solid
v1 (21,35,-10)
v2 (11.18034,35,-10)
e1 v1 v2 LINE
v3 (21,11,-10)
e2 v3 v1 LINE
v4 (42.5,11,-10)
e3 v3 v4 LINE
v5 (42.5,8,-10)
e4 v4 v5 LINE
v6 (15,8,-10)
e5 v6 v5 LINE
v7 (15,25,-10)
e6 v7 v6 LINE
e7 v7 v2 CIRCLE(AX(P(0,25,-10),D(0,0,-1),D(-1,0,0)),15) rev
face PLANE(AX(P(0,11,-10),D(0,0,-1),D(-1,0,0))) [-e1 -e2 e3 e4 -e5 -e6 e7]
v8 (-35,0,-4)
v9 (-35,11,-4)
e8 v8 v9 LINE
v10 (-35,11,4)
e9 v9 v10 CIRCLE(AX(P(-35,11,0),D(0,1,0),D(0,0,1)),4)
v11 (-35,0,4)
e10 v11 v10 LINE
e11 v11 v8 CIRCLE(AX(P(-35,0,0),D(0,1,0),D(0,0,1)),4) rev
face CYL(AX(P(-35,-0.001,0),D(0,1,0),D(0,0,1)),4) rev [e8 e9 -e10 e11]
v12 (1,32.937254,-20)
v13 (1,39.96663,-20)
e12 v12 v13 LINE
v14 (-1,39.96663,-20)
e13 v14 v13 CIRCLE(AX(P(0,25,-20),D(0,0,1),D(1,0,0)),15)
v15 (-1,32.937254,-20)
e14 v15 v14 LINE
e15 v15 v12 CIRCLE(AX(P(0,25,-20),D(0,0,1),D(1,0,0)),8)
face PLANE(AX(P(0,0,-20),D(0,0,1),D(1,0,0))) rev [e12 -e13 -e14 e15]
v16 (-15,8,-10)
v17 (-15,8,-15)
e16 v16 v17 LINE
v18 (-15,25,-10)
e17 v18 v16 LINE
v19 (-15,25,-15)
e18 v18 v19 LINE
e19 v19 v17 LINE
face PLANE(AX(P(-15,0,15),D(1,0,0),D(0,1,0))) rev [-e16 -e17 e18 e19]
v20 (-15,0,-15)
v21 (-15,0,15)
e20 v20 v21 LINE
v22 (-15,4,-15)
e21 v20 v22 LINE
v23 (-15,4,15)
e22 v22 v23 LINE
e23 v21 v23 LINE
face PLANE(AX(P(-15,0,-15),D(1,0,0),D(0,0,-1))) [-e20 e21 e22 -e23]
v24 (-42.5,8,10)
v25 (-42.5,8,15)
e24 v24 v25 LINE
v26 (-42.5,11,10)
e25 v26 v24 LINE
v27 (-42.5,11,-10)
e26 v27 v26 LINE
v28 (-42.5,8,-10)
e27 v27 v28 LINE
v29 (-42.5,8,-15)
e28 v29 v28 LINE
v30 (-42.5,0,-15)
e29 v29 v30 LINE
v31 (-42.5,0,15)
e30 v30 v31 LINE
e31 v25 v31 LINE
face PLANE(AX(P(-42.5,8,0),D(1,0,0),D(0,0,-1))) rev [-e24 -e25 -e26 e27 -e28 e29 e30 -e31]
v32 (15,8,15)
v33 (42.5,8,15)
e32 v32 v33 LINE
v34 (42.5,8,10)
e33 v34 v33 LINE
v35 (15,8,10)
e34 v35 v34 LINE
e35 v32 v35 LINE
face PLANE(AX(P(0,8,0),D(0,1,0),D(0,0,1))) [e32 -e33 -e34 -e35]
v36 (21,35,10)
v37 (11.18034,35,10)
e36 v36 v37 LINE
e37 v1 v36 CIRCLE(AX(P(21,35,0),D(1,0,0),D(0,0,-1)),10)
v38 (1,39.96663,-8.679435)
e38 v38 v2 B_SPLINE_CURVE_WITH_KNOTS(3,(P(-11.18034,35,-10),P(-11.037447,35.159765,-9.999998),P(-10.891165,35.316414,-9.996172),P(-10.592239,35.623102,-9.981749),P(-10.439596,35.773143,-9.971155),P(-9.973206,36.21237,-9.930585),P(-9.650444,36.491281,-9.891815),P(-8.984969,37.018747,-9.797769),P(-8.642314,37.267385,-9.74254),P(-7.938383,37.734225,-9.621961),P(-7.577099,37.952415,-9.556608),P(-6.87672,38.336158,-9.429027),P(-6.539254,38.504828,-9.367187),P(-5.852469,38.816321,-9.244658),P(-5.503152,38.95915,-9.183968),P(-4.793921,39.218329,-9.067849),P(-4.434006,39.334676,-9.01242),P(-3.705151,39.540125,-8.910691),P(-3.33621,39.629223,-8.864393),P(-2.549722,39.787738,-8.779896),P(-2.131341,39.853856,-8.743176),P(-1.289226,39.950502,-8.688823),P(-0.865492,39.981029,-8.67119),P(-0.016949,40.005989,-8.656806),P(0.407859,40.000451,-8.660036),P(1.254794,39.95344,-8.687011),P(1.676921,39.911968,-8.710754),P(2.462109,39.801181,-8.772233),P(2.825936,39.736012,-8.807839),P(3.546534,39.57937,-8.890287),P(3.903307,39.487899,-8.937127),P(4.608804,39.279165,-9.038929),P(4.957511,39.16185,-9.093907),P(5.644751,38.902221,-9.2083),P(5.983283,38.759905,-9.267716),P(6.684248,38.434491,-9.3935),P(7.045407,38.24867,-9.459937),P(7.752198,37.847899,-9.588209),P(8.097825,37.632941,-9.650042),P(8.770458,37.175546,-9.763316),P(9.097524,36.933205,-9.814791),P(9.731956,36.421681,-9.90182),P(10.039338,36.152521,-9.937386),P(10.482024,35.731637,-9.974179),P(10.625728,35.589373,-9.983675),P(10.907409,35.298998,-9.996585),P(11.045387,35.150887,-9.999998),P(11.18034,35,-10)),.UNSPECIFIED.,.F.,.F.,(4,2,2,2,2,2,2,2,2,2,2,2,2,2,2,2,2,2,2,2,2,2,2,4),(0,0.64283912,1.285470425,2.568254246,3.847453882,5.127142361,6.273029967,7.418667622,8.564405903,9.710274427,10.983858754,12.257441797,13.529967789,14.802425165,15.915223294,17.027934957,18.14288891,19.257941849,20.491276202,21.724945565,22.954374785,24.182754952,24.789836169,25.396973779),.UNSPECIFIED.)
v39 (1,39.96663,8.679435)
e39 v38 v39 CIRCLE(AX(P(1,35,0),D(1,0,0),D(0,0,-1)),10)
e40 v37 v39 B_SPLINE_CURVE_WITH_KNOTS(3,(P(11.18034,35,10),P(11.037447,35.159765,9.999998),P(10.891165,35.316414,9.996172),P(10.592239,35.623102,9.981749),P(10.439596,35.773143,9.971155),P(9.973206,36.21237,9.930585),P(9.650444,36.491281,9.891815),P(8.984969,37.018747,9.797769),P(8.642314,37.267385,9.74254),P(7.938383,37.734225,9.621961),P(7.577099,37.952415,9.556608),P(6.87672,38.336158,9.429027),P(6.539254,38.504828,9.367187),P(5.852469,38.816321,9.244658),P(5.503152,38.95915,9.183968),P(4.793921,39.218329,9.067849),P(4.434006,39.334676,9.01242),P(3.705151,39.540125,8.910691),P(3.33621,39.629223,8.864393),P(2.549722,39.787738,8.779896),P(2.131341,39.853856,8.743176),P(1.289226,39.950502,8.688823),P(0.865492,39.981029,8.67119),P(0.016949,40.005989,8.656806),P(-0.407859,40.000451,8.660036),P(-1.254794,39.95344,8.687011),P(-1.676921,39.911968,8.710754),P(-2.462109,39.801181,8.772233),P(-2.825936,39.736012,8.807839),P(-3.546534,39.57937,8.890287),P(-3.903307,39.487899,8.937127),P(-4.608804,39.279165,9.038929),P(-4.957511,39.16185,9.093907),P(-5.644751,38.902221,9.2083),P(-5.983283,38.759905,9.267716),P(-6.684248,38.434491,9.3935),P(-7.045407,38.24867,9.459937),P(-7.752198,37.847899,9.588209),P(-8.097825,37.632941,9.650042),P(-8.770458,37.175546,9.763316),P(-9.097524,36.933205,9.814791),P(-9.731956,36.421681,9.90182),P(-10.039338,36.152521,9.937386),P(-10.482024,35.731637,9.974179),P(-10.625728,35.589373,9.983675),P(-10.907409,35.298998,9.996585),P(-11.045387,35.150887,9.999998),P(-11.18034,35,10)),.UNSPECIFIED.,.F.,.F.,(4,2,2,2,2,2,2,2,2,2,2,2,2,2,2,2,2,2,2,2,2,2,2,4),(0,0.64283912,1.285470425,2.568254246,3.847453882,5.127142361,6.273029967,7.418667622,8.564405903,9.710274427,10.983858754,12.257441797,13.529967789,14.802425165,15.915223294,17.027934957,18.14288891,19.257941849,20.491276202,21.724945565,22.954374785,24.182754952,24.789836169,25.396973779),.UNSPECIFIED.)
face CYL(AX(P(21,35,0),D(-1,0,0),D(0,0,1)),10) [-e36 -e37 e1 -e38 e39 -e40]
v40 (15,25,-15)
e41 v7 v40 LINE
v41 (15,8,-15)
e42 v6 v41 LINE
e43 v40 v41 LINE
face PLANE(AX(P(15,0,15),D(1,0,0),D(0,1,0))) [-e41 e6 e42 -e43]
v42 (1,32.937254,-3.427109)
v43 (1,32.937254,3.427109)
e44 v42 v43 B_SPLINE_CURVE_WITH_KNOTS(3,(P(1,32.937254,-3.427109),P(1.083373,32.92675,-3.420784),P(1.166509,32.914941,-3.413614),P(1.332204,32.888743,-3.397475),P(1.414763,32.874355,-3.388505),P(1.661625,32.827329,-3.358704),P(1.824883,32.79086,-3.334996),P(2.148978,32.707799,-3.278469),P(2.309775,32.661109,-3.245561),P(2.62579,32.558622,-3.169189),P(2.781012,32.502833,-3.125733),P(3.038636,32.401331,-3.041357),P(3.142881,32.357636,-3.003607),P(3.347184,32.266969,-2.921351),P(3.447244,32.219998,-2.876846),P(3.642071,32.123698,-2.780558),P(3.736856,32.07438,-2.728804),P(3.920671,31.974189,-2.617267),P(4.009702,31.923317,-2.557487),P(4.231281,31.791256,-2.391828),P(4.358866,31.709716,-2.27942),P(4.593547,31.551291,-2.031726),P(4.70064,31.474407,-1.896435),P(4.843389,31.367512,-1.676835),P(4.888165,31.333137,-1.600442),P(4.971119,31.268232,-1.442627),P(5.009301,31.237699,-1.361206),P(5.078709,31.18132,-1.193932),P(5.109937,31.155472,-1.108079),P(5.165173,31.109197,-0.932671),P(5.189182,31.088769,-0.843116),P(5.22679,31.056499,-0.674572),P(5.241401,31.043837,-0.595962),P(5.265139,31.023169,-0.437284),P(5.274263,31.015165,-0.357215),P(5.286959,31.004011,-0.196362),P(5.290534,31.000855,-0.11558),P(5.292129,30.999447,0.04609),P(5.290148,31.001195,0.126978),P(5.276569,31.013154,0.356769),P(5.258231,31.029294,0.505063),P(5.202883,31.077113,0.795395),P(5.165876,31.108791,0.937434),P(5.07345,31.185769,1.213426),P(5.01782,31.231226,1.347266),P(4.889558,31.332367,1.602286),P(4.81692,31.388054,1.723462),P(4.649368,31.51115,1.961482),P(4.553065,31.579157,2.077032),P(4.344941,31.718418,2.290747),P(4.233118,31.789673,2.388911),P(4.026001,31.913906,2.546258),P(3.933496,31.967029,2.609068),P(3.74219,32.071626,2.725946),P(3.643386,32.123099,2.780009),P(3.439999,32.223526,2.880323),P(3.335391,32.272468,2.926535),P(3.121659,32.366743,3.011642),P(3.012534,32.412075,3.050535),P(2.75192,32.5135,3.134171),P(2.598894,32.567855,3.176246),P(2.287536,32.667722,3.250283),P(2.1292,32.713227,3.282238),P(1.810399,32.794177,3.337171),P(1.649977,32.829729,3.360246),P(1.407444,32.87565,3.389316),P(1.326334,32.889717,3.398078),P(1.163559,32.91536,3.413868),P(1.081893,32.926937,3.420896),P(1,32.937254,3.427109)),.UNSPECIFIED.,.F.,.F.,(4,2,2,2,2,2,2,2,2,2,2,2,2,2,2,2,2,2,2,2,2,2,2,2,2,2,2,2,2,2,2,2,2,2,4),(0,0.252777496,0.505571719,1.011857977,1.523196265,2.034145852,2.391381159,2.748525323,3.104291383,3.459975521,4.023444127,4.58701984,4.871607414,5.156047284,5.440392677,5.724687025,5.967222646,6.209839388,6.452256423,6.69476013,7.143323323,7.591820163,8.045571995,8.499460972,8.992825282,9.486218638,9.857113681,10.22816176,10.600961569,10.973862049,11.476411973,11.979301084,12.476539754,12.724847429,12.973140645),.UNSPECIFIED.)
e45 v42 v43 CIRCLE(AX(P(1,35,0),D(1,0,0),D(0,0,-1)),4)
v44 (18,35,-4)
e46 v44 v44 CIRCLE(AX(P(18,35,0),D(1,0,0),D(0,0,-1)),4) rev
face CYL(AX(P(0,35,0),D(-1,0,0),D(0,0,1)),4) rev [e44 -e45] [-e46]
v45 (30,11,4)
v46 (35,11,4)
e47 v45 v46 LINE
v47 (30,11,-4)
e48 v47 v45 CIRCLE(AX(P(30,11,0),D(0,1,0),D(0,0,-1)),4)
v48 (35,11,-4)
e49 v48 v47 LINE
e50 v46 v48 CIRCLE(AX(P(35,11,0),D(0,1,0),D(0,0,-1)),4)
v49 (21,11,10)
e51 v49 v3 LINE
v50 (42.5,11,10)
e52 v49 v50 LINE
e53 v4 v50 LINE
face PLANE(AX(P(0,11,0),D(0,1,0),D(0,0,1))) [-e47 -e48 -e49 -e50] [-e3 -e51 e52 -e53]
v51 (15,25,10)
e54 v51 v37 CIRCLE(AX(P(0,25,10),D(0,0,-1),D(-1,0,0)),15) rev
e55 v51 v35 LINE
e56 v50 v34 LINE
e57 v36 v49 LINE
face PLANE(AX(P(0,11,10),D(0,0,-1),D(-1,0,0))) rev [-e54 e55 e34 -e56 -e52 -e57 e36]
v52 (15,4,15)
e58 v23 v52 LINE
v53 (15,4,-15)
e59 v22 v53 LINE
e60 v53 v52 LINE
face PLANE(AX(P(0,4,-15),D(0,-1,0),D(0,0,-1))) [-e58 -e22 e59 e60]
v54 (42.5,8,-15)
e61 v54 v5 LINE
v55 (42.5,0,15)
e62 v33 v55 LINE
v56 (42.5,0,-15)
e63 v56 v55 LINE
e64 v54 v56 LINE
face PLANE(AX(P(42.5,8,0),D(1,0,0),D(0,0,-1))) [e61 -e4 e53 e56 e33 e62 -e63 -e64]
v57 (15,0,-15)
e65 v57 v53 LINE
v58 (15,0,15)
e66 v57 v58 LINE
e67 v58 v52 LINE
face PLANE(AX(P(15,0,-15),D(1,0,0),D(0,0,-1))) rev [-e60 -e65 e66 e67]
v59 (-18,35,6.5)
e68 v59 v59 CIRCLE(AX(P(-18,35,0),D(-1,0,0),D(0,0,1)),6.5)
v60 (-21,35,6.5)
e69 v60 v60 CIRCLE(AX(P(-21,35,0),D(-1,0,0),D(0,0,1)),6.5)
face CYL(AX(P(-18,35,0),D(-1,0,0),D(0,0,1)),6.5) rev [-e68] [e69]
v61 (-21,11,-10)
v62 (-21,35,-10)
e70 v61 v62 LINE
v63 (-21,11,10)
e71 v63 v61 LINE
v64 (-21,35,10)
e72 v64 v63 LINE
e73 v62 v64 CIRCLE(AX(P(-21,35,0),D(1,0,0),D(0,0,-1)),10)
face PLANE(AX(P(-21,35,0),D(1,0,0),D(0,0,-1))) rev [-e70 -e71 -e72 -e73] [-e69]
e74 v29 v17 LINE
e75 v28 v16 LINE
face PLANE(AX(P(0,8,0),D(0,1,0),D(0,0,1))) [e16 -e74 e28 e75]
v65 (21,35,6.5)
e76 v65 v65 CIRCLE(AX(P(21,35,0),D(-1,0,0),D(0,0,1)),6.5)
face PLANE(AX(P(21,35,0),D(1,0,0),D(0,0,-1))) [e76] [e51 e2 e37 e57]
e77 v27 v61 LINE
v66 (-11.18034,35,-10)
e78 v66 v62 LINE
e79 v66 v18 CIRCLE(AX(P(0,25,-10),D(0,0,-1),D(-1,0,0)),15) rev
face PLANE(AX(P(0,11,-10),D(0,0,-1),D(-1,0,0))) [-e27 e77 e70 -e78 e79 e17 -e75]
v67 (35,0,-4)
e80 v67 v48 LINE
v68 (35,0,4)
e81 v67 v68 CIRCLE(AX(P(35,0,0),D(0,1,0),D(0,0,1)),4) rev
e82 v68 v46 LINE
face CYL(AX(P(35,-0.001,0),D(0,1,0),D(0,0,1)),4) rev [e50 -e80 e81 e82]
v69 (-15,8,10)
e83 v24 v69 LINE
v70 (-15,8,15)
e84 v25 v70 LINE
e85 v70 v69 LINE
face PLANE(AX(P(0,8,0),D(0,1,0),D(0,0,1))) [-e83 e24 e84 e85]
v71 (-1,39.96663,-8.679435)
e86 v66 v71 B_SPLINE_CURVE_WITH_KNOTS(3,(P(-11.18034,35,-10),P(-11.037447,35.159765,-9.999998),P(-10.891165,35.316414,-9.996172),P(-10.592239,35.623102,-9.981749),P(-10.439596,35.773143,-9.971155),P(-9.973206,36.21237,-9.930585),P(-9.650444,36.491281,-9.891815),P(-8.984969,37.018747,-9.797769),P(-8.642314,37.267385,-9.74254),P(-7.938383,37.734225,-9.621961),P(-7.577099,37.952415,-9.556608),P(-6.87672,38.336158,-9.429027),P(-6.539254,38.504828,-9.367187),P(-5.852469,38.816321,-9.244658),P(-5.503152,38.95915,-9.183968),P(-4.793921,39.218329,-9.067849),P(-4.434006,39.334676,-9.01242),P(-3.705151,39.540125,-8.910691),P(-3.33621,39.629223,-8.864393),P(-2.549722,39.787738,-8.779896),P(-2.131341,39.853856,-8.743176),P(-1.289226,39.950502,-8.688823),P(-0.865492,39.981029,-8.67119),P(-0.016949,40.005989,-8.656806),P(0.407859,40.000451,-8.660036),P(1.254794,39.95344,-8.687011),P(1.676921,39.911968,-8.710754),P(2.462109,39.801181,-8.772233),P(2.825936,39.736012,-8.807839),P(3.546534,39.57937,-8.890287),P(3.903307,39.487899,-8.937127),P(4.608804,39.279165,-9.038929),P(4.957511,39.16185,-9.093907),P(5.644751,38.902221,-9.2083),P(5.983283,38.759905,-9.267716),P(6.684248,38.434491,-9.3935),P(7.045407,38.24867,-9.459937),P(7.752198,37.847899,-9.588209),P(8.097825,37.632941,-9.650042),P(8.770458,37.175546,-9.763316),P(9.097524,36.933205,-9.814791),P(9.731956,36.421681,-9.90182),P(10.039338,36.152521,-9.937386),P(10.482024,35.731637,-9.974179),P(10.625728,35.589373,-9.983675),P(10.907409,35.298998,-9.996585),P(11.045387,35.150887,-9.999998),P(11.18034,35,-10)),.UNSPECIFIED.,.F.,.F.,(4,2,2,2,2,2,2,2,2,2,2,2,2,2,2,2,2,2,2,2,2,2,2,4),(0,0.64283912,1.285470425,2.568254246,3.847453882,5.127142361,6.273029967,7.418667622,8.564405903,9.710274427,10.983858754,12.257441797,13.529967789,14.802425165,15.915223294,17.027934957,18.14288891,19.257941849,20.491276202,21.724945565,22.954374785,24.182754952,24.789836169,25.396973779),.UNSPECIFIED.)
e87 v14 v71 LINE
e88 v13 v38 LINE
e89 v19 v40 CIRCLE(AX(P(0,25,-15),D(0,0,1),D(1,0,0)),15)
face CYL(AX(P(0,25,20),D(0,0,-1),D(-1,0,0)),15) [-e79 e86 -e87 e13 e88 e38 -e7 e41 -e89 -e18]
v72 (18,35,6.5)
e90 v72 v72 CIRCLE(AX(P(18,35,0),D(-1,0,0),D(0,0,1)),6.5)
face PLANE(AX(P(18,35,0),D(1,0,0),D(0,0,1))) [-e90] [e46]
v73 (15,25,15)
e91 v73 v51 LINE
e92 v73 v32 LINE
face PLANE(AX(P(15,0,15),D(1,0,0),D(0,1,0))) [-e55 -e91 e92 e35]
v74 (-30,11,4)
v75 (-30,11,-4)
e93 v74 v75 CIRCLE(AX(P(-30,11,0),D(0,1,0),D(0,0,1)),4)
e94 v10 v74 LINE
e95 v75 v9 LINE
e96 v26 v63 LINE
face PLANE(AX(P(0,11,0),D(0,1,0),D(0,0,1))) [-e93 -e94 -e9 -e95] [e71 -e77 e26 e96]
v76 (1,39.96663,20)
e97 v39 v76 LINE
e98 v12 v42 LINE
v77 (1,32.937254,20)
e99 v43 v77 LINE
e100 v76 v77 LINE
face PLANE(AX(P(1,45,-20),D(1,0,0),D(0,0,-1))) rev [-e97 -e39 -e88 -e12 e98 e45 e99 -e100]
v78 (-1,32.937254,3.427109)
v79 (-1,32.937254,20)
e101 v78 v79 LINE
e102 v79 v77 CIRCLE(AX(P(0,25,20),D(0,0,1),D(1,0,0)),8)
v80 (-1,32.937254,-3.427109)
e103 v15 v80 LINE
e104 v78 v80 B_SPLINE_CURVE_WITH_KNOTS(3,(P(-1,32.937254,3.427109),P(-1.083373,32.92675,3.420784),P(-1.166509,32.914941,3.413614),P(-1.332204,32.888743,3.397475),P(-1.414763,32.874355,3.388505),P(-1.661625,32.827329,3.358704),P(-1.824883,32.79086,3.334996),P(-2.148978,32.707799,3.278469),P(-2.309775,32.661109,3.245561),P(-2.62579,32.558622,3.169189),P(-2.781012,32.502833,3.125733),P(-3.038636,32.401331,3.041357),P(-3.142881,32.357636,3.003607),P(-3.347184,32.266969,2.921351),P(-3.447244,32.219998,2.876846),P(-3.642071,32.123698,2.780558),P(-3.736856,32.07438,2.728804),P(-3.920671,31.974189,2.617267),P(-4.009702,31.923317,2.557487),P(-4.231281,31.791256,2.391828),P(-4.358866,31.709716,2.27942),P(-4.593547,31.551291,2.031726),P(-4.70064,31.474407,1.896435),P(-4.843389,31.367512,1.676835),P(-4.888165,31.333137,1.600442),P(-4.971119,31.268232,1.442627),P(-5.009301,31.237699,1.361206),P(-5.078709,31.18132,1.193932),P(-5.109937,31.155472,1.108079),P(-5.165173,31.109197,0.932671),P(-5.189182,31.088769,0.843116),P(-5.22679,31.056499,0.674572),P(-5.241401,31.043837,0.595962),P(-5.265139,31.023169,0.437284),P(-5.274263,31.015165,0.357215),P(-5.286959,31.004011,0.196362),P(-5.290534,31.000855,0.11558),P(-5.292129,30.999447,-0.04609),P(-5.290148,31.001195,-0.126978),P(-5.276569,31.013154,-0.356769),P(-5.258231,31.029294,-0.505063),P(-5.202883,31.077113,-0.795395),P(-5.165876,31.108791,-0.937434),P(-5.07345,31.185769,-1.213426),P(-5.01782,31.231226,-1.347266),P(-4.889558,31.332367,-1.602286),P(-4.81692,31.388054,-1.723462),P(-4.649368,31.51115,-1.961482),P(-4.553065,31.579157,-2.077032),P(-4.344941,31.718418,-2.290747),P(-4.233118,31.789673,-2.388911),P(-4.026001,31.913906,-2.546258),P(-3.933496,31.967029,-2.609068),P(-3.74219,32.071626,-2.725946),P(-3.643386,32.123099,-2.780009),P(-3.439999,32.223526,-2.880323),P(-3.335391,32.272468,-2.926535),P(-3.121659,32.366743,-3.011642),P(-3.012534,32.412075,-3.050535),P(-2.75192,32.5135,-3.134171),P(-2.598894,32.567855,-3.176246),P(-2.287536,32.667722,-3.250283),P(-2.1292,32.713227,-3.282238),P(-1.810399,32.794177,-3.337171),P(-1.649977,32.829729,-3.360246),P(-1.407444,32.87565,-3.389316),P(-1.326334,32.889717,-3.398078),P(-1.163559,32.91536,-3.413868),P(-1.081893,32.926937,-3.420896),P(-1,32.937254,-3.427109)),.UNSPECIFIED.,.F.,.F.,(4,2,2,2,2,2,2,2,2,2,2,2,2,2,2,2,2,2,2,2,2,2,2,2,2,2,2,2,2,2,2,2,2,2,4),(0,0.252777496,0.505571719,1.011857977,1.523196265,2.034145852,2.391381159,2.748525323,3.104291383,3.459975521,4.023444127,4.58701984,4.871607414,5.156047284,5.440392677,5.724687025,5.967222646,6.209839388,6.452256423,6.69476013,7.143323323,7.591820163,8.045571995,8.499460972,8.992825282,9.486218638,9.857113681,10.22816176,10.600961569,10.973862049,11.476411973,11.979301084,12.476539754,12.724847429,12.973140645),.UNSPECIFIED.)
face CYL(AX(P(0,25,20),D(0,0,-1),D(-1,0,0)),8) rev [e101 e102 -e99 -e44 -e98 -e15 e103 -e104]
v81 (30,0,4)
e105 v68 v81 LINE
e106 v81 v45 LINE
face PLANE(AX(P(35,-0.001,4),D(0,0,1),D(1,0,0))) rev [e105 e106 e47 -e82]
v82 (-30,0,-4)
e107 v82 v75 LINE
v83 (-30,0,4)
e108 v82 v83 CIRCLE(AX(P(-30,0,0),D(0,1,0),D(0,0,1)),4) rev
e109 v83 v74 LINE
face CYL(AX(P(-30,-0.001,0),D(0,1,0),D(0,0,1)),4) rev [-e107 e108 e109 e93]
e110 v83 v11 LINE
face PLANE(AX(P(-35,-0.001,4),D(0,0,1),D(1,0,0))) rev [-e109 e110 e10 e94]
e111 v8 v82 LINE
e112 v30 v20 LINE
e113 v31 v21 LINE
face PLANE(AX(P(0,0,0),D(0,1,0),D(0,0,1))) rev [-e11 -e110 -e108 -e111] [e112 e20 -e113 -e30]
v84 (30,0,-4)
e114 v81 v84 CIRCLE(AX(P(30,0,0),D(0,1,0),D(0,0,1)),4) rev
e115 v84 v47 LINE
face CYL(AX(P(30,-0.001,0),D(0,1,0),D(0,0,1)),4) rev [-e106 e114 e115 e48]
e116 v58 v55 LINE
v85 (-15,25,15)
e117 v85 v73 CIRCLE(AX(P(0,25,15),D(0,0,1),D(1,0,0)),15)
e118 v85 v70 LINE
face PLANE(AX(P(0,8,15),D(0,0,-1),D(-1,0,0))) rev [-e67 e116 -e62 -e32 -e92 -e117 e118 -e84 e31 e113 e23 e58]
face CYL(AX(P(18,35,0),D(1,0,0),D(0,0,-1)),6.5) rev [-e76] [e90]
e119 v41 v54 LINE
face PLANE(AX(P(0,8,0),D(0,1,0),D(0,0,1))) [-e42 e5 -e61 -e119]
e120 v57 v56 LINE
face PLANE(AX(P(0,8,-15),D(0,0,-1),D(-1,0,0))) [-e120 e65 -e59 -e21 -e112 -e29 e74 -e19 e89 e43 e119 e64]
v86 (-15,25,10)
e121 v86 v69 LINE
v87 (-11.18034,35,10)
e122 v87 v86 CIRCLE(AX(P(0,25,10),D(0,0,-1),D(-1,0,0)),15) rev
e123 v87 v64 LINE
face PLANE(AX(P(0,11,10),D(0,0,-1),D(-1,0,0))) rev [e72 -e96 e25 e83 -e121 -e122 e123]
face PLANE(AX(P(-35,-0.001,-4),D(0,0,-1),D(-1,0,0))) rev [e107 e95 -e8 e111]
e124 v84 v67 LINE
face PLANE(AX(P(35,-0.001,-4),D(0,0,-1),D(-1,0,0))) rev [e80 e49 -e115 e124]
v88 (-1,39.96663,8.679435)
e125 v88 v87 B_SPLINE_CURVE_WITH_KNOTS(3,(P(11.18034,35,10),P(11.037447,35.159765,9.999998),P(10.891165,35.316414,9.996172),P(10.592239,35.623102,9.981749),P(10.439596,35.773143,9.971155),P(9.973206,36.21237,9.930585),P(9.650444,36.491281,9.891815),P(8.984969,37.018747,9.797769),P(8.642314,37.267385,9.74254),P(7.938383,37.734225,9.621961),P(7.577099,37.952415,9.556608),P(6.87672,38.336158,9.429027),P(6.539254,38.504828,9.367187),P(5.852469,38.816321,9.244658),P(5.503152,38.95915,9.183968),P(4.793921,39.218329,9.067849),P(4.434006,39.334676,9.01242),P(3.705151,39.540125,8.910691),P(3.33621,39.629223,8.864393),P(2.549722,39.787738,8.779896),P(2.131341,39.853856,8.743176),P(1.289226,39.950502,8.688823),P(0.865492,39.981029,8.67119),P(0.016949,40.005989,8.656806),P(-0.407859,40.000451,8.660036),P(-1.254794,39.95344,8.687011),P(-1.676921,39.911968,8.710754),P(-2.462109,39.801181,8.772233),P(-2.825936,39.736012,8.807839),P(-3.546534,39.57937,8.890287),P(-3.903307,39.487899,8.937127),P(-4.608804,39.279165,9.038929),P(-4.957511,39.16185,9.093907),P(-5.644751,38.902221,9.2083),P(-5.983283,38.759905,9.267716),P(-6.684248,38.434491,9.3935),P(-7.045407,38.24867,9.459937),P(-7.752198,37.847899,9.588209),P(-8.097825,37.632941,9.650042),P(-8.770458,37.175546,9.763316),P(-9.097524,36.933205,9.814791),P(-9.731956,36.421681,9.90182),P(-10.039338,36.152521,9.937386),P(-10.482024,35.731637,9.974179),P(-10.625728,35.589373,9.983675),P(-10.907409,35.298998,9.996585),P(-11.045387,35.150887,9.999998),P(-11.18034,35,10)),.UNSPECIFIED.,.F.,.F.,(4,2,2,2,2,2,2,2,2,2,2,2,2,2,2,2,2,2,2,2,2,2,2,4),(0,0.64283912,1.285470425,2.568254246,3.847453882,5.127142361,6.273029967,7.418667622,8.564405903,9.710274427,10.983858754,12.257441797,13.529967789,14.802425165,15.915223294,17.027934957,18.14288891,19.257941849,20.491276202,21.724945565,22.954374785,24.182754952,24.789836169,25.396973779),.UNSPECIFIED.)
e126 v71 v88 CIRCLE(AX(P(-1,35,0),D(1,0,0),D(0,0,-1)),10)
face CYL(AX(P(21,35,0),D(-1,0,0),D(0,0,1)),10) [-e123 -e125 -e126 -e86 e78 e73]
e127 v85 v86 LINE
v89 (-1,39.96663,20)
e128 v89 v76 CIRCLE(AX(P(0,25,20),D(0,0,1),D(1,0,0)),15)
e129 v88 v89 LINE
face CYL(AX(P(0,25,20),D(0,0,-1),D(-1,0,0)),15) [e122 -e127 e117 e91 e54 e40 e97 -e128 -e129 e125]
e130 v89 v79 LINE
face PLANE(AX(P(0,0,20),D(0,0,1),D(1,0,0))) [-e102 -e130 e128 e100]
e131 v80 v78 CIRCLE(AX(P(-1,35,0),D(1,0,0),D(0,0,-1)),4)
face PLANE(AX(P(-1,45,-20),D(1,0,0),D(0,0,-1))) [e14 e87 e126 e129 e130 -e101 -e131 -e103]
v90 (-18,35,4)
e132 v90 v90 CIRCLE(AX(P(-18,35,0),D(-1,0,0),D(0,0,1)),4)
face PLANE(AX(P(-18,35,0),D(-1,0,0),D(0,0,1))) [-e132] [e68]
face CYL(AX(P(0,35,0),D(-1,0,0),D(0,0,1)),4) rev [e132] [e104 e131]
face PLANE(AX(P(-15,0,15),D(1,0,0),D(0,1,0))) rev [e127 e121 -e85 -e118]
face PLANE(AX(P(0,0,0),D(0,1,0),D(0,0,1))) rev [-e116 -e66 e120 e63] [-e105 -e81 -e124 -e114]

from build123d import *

# Parameters (mm, degrees)
SKETCH_1_W                 = 85
SKETCH_1_H                 = 5
EXTRUDE_1_DEPTH            = 8
EXTRUDE_1_2_DEPTH          = 8
SKETCH_1_3_W               = 85
SKETCH_1_3_H               = 20
EXTRUDE_2_DEPTH            = 11
EXTRUDE_3_DEPTH            = 21
SKETCH_6_R                 = 6.5
SKETCH_6_R_2               = 4
CUT_EXTRUDE_1_DEPTH        = 3
SKETCH_6_2_R               = 4
CUT_EXTRUDE_2_DEPTH        = 21
SKETCH_10_R                = 15
SKETCH_10_R_2              = 8
EXTRUDE_6_DEPTH            = 20
EXTRUDE_7_DEPTH            = 15
SKETCH_10_4_W              = 30
SKETCH_10_4_H              = 4
SKETCH_10_4_R              = 8
CUT_EXTRUDE_4_DEPTH        = 15
CUT_EXTRUDE_2_2_DEPTH      = 66.048059256
CUT_EXTRUDE_2_2_DEPTH_BACK = 1
CUT_EXTRUDE_2_2_START      = 25
SKETCH_12_W                = 2
SKETCH_12_H                = 40
CUT_EXTRUDE_5_REACH        = 59.985
SKETCH_6_4_R               = 4
CUT_EXTRUDE_6_DEPTH        = 81.357015954


with BuildPart() as part:
    # 草图1 → 凸台-拉伸1 (new body)
    with BuildSketch(Plane(origin=(0, 0, 0), x_dir=(1, 0, 0), z_dir=(0, 1, 0))):
        with Locations((0, 12.5)):
            Rectangle(SKETCH_1_W, SKETCH_1_H)
    extrude(amount=EXTRUDE_1_DEPTH)



with BuildPart() as body_2:
    # 草图1 → Extrude 1 2 (new body)
    with BuildSketch(Plane(origin=(0, 0, 0), x_dir=(1, 0, 0), z_dir=(0, 1, 0))):
        with Locations((0, -12.5)):
            Rectangle(SKETCH_1_W, SKETCH_1_H)
    extrude(amount=EXTRUDE_1_2_DEPTH)


with BuildPart() as part_1:
    add(part.part)

    add(body_2.part)  # 凸台-拉伸2 merges body 2
    # 草图1<3> → 凸台-拉伸2 (add)
    with BuildSketch(Plane(origin=(0, 0, 0), x_dir=(1, 0, 0), z_dir=(0, 1, 0))):
        Rectangle(SKETCH_1_3_W, SKETCH_1_3_H)
    extrude(amount=EXTRUDE_2_DEPTH)

    # 草图3 → 凸台-拉伸3 (add, symmetric)
    with BuildSketch(Plane(origin=(0, 0, 0), x_dir=(0, 0, -1), z_dir=(1, 0, 0))):
        with BuildLine():
            Line((-10, 35), (-10, 11))
            Line((-10, 11), (10, 11))
            Line((10, 11), (10, 35))
            ThreePointArc((10, 35), (0, 45), (-10, 35))
        make_face()
    extrude(amount=EXTRUDE_3_DEPTH, both=True)

    # 草图6 → 切除-拉伸1 (cut)
    with BuildSketch(Plane.ZY.offset(21)):
        with Locations((0, 35)):
            Circle(SKETCH_6_R)
        with Locations((0, 35)):
            Circle(SKETCH_6_R_2, mode=Mode.SUBTRACT)
    cut_extrude_1 = extrude(amount=-CUT_EXTRUDE_1_DEPTH, mode=Mode.SUBTRACT)

    # 草图6<2> → Cut-Extrude 2 (cut)
    with BuildSketch(Plane.ZY.offset(21)):
        with Locations((0, 35)):
            Circle(SKETCH_6_2_R)
    cut_extrude_2 = extrude(amount=-CUT_EXTRUDE_2_DEPTH, mode=Mode.SUBTRACT)

    # 镜向1: 切除-拉伸1, Cut-Extrude 2 across plane
    add(cut_extrude_1.mirror(Plane(origin=(0, 0, 0), x_dir=(0, 0, 1), z_dir=(1, 0, 0))), mode=Mode.SUBTRACT)
    add(cut_extrude_2.mirror(Plane(origin=(0, 0, 0), x_dir=(0, 0, 1), z_dir=(1, 0, 0))), mode=Mode.SUBTRACT)

    # 草图10 → 凸台-拉伸6 (add, symmetric)
    with BuildSketch(Plane.XY):
        with Locations((0, 25)):
            Circle(SKETCH_10_R)
        with Locations((0, 25)):
            Circle(SKETCH_10_R_2, mode=Mode.SUBTRACT)
    extrude(amount=EXTRUDE_6_DEPTH, both=True)

    # 草图10<3> → 凸台-拉伸7 (add, symmetric)
    with BuildSketch(Plane.XY):
        with BuildLine():
            Line((15, 8), (15, 25))
            ThreePointArc((15, 25), (0, 10), (-15, 25))
            Line((-15, 25), (-15, 8))
            Line((-15, 8), (15, 8))
        make_face()
    extrude(amount=EXTRUDE_7_DEPTH, both=True)

    # 草图10<4> → 切除-拉伸4 (cut, symmetric)
    with BuildSketch(Plane.XY):
        with Locations((0, 2)):
            Rectangle(SKETCH_10_4_W, SKETCH_10_4_H)
        with Locations((0, 25)):
            Circle(SKETCH_10_4_R)
    extrude(amount=CUT_EXTRUDE_4_DEPTH, both=True, mode=Mode.SUBTRACT)

    # 草图12 → Cut-Extrude 2 2 (cut, two sides: drawn at the far end of the back side and taken through both)
    with BuildSketch(Plane(origin=(0, 0, 0), x_dir=(1, 0, 0), z_dir=(0, 1, 0)).offset(CUT_EXTRUDE_2_2_START - CUT_EXTRUDE_2_2_DEPTH_BACK)):
        Rectangle(SKETCH_12_W, SKETCH_12_H)
    extrude(amount=CUT_EXTRUDE_2_2_DEPTH + CUT_EXTRUDE_2_2_DEPTH_BACK, mode=Mode.SUBTRACT)

    # 草图14 → 切除-拉伸5 (cut, up to next)
    with BuildSketch(Plane(origin=(0, 11, 0), x_dir=(1, 0, 0), z_dir=(0, 1, 0)), mode=Mode.PRIVATE) as cut_extrude_5_sk1:
        with BuildLine():
            Line((-35, 4), (-30, 4))
            ThreePointArc((-30, 4), (-26, 0), (-30, -4))
            Line((-30, -4), (-35, -4))
            ThreePointArc((-35, -4), (-39, 0), (-35, 4))
        make_face()
    cut_extrude_5_tool1 = extrude(cut_extrude_5_sk1.sketch, amount=-CUT_EXTRUDE_5_REACH, mode=Mode.PRIVATE) & part_1.part
    # 草图14 → 切除-拉伸5 (cut, up to next)
    with BuildSketch(Plane(origin=(0, 11, 0), x_dir=(1, 0, 0), z_dir=(0, 1, 0)), mode=Mode.PRIVATE) as cut_extrude_5_sk2:
        with BuildLine():
            Line((35, 4), (30, 4))
            ThreePointArc((30, 4), (26, 0), (30, -4))
            Line((30, -4), (35, -4))
            ThreePointArc((35, -4), (39, 0), (35, 4))
        make_face()
    cut_extrude_5_tool2 = extrude(cut_extrude_5_sk2.sketch, amount=-CUT_EXTRUDE_5_REACH, mode=Mode.PRIVATE) & part_1.part
    add(cut_extrude_5_tool1.solids().sort_by_distance((-32.5, 11, 0))[0], mode=Mode.SUBTRACT)
    add(cut_extrude_5_tool2.solids().sort_by_distance((32.5, 11, 0))[0], mode=Mode.SUBTRACT)

    # 草图6<4> → 切除-拉伸6 (cut, through all)
    with BuildSketch(Plane.ZY.offset(21)):
        with Locations((0, 35)):
            Circle(SKETCH_6_4_R)
    extrude(amount=-CUT_EXTRUDE_6_DEPTH, mode=Mode.SUBTRACT)


solid = part_1.part
